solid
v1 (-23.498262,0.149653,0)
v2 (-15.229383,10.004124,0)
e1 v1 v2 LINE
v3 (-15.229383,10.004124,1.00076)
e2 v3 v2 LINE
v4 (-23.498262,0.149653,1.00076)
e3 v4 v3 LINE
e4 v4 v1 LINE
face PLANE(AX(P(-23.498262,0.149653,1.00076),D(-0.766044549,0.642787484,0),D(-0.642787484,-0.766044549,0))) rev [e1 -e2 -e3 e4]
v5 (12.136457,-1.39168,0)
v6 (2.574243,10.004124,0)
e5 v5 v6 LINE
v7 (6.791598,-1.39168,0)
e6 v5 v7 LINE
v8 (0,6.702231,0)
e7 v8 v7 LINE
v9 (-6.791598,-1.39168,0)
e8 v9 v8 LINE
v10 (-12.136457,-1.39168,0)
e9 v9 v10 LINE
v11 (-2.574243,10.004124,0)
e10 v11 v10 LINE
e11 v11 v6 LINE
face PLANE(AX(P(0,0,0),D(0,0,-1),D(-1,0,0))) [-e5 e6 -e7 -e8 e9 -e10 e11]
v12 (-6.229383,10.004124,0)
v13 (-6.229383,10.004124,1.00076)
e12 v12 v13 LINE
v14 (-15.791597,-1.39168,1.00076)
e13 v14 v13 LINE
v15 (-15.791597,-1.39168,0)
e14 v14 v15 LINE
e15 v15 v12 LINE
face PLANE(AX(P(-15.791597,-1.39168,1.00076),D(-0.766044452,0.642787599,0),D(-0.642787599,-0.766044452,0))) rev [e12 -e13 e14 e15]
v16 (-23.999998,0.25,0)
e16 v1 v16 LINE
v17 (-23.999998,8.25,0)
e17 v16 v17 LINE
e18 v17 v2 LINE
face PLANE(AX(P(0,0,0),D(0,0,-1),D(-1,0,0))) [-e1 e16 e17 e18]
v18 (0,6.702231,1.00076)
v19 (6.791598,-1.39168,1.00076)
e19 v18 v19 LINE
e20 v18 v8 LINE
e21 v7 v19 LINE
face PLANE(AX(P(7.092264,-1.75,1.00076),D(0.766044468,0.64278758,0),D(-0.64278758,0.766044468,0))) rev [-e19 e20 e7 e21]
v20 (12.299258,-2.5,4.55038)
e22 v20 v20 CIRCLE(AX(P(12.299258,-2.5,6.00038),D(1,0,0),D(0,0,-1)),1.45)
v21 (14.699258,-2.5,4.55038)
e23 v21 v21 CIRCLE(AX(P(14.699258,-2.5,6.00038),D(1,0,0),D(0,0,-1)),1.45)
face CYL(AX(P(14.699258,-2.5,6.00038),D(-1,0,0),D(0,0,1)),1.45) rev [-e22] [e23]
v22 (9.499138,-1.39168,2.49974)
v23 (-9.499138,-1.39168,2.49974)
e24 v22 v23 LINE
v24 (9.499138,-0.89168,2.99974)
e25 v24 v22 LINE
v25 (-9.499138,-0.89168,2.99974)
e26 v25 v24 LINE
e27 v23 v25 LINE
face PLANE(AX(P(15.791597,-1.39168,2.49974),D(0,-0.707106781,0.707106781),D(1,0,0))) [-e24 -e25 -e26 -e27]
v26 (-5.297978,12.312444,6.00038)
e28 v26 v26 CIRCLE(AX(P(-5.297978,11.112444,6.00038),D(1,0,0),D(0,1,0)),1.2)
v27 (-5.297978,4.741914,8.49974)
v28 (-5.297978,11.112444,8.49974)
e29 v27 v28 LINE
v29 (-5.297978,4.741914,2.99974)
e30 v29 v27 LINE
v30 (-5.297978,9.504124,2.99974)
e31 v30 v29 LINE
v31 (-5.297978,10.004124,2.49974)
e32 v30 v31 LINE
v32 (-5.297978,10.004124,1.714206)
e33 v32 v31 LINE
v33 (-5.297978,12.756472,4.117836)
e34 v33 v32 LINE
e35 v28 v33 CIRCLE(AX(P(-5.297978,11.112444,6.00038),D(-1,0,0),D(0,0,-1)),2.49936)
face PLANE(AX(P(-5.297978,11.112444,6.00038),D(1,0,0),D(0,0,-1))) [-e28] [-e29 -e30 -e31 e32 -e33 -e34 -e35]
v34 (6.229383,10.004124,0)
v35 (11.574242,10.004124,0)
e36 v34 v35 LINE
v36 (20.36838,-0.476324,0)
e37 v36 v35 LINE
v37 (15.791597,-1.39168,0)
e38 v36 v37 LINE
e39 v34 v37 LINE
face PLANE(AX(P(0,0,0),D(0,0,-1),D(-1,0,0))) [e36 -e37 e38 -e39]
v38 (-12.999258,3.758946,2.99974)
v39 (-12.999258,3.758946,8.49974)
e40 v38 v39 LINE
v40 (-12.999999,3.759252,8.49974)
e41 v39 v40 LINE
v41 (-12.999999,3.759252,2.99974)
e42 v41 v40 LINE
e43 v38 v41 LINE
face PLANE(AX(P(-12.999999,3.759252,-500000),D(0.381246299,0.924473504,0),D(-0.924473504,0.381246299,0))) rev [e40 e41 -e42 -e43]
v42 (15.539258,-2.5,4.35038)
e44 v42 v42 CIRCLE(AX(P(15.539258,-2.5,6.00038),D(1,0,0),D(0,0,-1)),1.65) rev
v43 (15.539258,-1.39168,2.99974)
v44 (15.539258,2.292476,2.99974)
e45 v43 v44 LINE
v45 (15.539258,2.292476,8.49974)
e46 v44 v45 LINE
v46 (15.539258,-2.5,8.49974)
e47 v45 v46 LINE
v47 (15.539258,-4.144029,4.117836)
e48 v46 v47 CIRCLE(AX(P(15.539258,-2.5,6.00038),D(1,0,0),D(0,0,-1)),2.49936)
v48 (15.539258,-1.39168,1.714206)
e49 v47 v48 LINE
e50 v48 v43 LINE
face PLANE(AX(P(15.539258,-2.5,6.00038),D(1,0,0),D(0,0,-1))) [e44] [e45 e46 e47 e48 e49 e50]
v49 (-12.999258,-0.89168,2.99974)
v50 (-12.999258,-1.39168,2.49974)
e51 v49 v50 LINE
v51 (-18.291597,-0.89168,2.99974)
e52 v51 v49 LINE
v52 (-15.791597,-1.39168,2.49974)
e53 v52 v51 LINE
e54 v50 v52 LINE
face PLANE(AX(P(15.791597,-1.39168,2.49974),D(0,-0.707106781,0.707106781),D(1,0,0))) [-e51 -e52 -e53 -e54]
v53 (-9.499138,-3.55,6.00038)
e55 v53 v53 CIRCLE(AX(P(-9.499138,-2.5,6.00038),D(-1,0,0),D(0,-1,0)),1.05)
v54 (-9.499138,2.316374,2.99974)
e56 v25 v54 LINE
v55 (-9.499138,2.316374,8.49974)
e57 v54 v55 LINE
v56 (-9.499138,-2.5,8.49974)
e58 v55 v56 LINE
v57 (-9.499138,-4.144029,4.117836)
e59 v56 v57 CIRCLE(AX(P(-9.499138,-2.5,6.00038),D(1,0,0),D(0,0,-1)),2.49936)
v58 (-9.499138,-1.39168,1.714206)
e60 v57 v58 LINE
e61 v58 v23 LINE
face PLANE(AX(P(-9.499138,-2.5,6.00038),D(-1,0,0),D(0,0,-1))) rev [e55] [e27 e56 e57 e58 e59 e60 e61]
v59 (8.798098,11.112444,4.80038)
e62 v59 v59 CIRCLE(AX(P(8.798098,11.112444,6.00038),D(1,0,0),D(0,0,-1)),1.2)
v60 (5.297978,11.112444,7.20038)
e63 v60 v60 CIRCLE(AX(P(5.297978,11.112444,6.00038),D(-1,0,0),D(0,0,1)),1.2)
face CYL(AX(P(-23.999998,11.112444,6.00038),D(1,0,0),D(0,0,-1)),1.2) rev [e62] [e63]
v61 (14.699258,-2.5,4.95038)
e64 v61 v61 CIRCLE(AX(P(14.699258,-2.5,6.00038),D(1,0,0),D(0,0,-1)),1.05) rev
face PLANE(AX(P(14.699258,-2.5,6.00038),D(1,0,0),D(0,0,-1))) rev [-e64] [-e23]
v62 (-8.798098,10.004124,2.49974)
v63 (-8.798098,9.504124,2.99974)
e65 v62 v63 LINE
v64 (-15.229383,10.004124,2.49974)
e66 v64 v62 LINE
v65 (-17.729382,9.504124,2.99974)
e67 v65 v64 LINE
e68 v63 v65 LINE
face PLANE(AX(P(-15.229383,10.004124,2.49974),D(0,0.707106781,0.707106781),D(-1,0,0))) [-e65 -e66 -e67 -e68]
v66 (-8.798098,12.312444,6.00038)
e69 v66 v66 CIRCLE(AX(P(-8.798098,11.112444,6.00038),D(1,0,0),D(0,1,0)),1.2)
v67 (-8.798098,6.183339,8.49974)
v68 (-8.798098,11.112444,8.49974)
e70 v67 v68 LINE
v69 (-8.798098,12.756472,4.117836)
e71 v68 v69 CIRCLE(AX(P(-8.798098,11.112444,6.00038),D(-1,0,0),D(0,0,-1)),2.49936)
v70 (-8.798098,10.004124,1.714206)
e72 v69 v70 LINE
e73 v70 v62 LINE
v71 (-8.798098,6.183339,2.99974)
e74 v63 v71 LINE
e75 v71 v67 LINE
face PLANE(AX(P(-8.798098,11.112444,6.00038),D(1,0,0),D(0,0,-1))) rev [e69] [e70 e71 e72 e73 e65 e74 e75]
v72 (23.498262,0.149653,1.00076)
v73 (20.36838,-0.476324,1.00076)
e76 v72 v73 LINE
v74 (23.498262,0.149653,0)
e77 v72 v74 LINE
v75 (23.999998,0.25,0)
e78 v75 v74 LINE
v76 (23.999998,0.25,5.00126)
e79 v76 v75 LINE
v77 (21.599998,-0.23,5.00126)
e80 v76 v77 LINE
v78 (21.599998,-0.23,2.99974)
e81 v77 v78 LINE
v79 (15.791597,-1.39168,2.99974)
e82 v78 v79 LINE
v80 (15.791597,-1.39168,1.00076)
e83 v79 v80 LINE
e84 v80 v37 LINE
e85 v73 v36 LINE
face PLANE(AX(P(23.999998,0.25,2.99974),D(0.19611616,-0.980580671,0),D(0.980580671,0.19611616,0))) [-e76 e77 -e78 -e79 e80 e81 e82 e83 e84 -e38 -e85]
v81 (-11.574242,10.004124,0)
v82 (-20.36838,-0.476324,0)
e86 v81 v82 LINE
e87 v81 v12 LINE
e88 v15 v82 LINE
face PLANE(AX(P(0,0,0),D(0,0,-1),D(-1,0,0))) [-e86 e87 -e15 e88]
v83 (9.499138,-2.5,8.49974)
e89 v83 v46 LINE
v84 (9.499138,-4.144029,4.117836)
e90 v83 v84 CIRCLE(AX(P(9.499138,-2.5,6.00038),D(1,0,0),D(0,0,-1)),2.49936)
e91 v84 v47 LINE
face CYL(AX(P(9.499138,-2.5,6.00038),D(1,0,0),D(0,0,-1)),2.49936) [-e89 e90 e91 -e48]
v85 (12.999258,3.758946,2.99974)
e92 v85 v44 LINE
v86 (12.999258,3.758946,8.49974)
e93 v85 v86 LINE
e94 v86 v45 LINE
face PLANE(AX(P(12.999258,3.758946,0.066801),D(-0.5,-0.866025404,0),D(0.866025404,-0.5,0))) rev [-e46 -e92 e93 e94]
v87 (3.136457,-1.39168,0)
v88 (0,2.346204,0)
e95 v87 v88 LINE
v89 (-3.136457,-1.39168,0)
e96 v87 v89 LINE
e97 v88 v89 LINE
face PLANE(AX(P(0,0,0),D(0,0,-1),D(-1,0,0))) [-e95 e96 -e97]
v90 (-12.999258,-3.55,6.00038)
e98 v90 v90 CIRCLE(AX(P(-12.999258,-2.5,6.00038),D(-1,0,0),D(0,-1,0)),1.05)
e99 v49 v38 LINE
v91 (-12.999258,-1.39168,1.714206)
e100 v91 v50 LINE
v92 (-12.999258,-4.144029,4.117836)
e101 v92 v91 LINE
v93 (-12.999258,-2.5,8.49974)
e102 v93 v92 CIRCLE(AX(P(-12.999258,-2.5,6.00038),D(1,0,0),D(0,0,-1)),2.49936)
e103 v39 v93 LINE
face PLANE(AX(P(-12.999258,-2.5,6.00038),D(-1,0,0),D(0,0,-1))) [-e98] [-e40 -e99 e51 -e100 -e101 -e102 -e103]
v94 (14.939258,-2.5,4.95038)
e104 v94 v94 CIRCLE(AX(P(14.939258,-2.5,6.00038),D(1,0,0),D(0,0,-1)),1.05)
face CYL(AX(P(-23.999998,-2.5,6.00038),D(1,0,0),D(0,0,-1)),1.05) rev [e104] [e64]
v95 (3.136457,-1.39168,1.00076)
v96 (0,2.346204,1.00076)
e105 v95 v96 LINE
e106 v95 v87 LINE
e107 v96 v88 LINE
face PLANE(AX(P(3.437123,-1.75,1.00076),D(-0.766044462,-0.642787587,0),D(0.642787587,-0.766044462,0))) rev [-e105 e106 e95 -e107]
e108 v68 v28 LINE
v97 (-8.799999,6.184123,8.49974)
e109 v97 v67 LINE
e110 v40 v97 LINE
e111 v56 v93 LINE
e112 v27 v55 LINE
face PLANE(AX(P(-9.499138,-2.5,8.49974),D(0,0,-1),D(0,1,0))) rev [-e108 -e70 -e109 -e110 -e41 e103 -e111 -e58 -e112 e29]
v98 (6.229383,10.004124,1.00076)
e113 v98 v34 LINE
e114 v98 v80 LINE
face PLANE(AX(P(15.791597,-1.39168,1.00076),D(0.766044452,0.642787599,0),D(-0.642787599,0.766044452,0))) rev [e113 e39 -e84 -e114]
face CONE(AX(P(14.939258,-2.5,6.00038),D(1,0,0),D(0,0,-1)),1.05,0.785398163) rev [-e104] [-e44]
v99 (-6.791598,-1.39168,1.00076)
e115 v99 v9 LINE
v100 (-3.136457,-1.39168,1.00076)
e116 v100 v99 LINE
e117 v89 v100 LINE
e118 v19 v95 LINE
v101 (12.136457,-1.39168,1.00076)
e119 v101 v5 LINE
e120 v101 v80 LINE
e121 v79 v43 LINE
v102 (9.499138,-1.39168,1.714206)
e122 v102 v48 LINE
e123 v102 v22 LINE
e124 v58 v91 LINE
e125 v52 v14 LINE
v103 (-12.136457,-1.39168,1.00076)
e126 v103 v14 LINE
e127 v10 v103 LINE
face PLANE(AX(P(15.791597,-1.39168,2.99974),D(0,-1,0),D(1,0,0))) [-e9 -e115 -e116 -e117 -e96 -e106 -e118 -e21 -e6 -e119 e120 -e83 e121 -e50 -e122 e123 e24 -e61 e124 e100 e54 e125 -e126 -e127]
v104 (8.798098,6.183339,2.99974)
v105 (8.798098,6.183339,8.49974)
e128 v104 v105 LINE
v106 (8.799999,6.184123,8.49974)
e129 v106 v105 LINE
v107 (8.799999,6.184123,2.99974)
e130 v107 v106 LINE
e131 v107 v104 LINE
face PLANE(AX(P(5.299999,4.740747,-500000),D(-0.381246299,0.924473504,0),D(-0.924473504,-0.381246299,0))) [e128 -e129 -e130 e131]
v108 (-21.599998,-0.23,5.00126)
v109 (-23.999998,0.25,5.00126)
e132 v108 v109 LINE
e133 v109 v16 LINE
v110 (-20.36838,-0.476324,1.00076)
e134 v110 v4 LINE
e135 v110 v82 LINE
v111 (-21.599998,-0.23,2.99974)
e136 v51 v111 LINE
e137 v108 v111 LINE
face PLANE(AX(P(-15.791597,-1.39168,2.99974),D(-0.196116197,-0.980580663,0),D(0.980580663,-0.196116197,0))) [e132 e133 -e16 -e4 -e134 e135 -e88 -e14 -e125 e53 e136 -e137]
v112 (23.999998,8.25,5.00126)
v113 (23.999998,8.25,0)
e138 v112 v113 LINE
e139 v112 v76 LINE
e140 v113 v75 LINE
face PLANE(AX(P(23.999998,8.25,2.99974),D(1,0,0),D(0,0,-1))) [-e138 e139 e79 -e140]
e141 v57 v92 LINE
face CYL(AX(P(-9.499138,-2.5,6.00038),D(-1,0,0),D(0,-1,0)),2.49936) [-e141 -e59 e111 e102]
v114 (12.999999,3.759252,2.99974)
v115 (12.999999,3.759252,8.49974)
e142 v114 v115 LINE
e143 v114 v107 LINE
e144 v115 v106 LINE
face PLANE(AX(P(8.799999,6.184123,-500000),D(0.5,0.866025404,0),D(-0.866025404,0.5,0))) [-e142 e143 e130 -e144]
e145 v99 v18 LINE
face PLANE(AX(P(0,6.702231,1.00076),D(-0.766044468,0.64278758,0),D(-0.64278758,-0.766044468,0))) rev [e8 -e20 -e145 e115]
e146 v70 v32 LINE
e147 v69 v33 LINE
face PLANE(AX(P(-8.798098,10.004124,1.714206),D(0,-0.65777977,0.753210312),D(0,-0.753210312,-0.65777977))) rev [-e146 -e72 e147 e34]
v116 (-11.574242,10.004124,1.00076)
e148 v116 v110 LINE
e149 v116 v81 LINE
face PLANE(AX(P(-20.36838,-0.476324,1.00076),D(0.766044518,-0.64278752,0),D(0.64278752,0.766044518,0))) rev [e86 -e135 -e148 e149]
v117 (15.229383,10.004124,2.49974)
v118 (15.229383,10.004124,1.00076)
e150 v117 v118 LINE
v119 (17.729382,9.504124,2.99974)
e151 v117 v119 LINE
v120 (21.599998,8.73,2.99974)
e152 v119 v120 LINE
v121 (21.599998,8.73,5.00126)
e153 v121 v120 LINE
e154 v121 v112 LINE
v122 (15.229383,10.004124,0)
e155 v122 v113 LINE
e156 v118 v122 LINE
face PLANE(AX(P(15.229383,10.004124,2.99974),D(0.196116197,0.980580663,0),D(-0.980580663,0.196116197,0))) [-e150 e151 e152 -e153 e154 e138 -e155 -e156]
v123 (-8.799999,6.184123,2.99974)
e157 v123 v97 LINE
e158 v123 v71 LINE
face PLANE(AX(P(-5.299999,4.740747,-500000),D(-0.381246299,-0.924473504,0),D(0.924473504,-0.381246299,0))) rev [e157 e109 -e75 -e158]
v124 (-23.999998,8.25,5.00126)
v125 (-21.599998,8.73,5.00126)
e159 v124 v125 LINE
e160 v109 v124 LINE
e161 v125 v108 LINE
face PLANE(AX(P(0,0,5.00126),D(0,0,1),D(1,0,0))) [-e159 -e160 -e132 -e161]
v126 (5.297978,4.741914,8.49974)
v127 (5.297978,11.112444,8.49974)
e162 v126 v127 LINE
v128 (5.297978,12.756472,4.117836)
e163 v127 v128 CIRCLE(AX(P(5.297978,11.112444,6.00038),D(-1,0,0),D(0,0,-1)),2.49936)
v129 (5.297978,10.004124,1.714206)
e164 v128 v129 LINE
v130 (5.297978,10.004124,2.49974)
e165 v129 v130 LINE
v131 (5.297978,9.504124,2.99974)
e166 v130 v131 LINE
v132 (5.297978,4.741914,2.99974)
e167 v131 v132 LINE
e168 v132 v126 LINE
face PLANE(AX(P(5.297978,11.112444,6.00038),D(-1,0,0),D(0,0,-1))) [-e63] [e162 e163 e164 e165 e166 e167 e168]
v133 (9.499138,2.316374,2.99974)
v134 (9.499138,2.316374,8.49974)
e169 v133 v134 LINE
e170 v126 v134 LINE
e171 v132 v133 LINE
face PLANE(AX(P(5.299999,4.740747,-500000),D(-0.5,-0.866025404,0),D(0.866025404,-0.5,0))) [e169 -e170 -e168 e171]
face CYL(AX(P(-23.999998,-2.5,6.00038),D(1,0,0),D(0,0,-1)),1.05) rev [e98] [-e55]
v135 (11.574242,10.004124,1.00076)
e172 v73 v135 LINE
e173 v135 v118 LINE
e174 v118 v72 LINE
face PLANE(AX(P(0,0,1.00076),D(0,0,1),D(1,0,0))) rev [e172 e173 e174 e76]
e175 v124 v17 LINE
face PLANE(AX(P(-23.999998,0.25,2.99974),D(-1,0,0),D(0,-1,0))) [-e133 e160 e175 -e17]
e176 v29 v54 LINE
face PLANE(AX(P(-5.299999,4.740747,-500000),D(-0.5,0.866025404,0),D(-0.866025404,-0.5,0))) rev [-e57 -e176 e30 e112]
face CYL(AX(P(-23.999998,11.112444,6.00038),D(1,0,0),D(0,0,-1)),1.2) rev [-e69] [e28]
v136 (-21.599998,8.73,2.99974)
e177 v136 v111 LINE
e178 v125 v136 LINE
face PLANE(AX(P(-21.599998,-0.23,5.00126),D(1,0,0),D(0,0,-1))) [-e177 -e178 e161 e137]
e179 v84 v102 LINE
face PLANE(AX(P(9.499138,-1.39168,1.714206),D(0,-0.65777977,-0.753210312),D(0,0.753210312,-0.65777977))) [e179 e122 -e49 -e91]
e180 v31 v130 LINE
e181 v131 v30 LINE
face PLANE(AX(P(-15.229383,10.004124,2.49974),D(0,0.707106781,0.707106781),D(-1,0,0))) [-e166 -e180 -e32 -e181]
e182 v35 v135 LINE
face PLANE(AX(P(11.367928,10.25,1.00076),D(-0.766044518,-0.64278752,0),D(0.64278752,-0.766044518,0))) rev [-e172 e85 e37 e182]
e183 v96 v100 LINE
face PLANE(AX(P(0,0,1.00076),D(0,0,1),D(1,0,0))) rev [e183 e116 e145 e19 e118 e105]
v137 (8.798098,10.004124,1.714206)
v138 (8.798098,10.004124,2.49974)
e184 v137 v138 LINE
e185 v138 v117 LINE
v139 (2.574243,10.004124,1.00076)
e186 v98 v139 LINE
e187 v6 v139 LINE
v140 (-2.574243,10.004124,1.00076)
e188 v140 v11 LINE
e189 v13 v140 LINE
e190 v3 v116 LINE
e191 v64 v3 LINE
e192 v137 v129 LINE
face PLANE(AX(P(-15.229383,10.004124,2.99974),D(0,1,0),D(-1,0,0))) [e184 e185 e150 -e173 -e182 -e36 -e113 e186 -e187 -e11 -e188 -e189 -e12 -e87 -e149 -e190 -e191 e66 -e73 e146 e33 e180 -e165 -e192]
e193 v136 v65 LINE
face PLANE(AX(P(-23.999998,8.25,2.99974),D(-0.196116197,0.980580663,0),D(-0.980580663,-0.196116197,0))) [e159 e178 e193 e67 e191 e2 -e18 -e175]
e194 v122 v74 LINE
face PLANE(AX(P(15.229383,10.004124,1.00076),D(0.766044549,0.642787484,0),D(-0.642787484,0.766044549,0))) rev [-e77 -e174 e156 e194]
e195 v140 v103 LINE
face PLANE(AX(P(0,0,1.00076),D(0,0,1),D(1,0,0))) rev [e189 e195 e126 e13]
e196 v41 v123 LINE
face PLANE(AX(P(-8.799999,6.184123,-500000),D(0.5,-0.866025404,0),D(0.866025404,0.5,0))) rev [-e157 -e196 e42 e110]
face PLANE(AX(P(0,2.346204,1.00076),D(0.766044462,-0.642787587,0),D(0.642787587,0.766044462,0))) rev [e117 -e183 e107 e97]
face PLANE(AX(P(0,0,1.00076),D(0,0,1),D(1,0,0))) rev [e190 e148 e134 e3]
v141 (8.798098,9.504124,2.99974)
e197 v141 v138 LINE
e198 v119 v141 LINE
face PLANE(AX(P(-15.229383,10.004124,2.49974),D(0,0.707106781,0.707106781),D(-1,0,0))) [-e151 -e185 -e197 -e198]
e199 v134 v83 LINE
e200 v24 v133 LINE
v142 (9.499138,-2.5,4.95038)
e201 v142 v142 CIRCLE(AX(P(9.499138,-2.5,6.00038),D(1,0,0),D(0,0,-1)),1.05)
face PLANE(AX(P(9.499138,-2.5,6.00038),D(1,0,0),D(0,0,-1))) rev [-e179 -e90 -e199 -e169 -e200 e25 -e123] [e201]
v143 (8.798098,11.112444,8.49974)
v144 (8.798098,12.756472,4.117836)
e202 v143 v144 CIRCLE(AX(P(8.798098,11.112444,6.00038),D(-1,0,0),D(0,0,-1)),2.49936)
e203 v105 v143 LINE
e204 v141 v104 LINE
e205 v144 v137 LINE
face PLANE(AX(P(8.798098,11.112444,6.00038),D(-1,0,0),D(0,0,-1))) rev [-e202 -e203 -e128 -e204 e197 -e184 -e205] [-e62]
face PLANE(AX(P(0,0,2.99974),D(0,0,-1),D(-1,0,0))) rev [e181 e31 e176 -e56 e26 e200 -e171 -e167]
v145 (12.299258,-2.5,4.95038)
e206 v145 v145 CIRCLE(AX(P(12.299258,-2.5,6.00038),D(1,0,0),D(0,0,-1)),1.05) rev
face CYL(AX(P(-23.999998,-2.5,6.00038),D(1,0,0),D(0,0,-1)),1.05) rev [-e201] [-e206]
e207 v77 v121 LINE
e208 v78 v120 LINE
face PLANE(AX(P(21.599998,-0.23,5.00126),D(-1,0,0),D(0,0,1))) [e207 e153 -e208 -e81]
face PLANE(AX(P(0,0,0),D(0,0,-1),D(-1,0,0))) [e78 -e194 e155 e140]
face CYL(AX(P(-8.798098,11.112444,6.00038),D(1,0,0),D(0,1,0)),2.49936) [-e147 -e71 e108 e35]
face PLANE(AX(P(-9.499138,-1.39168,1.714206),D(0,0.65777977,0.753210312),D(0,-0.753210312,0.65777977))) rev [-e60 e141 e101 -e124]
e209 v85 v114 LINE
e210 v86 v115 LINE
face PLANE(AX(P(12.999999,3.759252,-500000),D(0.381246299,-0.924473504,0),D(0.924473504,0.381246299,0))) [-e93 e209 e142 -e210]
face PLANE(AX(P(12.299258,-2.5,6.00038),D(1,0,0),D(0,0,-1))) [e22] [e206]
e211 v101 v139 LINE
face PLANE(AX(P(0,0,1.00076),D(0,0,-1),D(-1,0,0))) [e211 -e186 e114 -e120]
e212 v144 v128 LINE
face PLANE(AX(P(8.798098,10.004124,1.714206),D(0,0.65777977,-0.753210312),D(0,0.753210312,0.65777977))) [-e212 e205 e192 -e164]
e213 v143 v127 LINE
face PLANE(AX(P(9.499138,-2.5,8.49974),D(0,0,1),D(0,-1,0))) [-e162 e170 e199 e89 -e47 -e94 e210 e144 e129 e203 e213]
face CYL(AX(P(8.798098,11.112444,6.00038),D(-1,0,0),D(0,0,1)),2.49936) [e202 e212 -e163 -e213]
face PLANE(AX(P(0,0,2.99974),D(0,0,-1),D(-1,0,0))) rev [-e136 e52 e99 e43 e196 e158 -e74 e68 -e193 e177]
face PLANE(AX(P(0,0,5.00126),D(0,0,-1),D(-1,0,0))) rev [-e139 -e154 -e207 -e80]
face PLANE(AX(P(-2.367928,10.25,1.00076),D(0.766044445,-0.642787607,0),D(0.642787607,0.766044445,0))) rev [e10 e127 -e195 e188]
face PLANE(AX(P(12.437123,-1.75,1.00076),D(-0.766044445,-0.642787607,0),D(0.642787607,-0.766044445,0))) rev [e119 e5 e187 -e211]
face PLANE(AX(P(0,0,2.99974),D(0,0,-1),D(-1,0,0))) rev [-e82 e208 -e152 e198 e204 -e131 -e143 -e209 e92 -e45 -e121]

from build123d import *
from OCP.BRepAlgoAPI import BRepAlgoAPI_Cut
from OCP.TopTools import TopTools_ListOfShape

# Parameters (mm, degrees)
BOSS_EXTRUDE1_DEPTH    = 2.99974
BOSS_EXTRUDE2_DEPTH    = 5.00126
BOSS_EXTRUDE3_DEPTH    = 3.50012
CIRPATTERN1_COUNT      = 2
BOSS_EXTRUDE4_REACH    = 30.871
CUT_EXTRUDE1_DEPTH     = 5.5
CUT_EXTRUDE2_DEPTH     = 1.00076
MIRROR2_START          = -12.999258093
MIRROR2_DEPTH          = 7.70128
MIRROR2_START_2        = 2.99974
MIRROR2_2_DEPTH        = 5.5
MIRROR2_3_OUTLINE_W    = 4.20116
MIRROR2_3_OUTLINE_H    = 4.60831964
MIRROR2_3_OUTLINE_H_2  = 4.995876312
MIRROR2_3_DEPTH        = 2.99974
MIRROR2_4_DEPTH        = 5.5
SKETCH9_R              = 1.05
OUTSIDE_HOLES_DEPTH    = 41.329539227
SKETCH10_R             = 1.2
INSIDE_HOLES_DEPTH     = 37.513584997
BOSS_EXTRUDE5_START    = 2.54
SKETCH12_R             = 1.05
BOSS_EXTRUDE5_DEPTH    = 2.54
HEAD_POCKET_DEPTH      = 1.7
HEAD_POCKET_DEPTH_BACK = 0.7
SKETCH11_R             = 1.45
CHAMFER1_SIZE          = 0.6
CORNER_CUT_DEPTH       = 5.5
CHAMFER2_SIZE          = 0.5


with BuildPart() as part:
    # Sketch1 → Boss-Extrude1 (new body)
    with BuildSketch(Plane(origin=(0, 0, 0), x_dir=(-1, 0, 0), z_dir=(0, 0, -1))):
        Polygon((23.999998093, 0.250000321), (23.999998093, 8.25), (15.229382515, 10.004123688), (-15.229382515, 10.004123688), (-23.999998093, 8.25), (-23.999998093, 0.25), (-15.791597366, -1.39168036), (15.791597366, -1.39168036), align=None)
    extrude(amount=-BOSS_EXTRUDE1_DEPTH)

    # Sketch2 → Boss-Extrude2 (add)
    with BuildSketch(Plane(origin=(0, 0, 0), x_dir=(-1, 0, 0), z_dir=(0, 0, -1))):
        Polygon((21.599998474, -0.230000138), (21.599998474, 8.729999542), (23.999998093, 8.25), (23.999998093, 0.249999762), align=None)
        Polygon((-23.999998093, 0.249999762), (-23.999998093, 8.25), (-21.599998474, 8.729999542), (-21.599998474, -0.230000138), align=None)
    extrude(amount=-BOSS_EXTRUDE2_DEPTH)

    # Sketch3 → Boss-Extrude3 (add)
    with BuildSketch(Plane(origin=(12.999258093, 0, 0), x_dir=(0, 0, -1), z_dir=(1, 0, 0))):
        with BuildLine():
            Line((-2.99974, 4.117571831), (-8.49974, 4.117571354))
            Line((-8.49974, 4.117571354), (-8.49974, -2.500000222))
            ThreePointArc((-8.49974, -2.500000222), (-6.87834524, -4.840080872), (-4.117836275, -4.144028668))
            Line((-4.117836275, -4.144028668), (-1.714206095, -1.39168036))
            Line((-1.714206095, -1.39168036), (-2.99974, -1.39168036))
            Line((-2.99974, -1.39168036), (-2.99974, 4.117571831))
        make_face()
    boss_extrude3 = extrude(amount=-BOSS_EXTRUDE3_DEPTH)

    # CirPattern1: Boss-Extrude3 ×2 about axis
    cirpattern1_axis = Axis((9.148618093, 4.306221664, 0), (0, 0, 1))
    for i in range(1, CIRPATTERN1_COUNT):
        add(boss_extrude3.rotate(cirpattern1_axis, i * 360 / CIRPATTERN1_COUNT))

    # Sketch4 → Boss-Extrude4 (add, up to next)
    with BuildSketch(Plane.XY.offset(8.49974), mode=Mode.PRIVATE) as boss_extrude4_sk1:
        Polygon((8.799999237, 6.184122562), (12.999999024, 3.759251555), (9.499999024, 2.315876444), (5.299999237, 4.740747452), align=None)
    boss_extrude4_tool1 = extrude(boss_extrude4_sk1.sketch, amount=-BOSS_EXTRUDE4_REACH, mode=Mode.PRIVATE) - part.part
    add(boss_extrude4_tool1.solids().sort_by_distance((9.149999, 4.25, 8.49974))[0])


with BuildPart() as cut_extrude1_tool:
    # Sketch5 → Cut-Extrude1 (new body)
    with BuildSketch(Plane.XY.offset(8.49974)):
        Polygon((12.999999024, 3.759251555), (12.999258093, 4.117571354), (12.379370927, 4.117571354), align=None)
        Polygon((5.725868057, 4.494871974), (5.297978093, 4.494871974), (5.297978093, 4.74191436), align=None)
    extrude(amount=-CUT_EXTRUDE1_DEPTH)


with BuildPart() as part_1:
    add(part.part)

    # Cut-Extrude1: cut by cut_extrude1_tool, with a tolerance
    cut_extrude1_stock = TopTools_ListOfShape()
    cut_extrude1_stock.Append(part_1.part.wrapped)
    cut_extrude1_tools = TopTools_ListOfShape()
    cut_extrude1_tools.Append(cut_extrude1_tool.part.wrapped)
    cut_extrude1_cut = BRepAlgoAPI_Cut()
    cut_extrude1_cut.SetArguments(cut_extrude1_stock)
    cut_extrude1_cut.SetTools(cut_extrude1_tools)
    cut_extrude1_cut.SetFuzzyValue(0.00001)
    cut_extrude1_cut.Build()
    add(Compound.cast(cut_extrude1_cut.Shape()).solids(), mode=Mode.REPLACE)


with BuildPart() as cut_extrude2_tool:
    # Sketch6 → Cut-Extrude2 (new body)
    with BuildSketch(Plane(origin=(0, 0, 0), x_dir=(-1, 0, 0), z_dir=(0, 0, -1))):
        Polygon((20.368379593, -0.476323605), (11.367927551, 10.25), (15.229382515, 10.004123688), (23.498262405, 0.149653077), align=None)
        Polygon((2.36792779, 10.25), (12.437123299, -1.75), (15.791597366, -1.39168036), (6.023067951, 10.25), align=None)
        Polygon((0, 6.702231407), (7.092263699, -1.75), (3.437123299, -1.75), (0, 2.346204281), (-3.437123299, -1.75), (-7.092263699, -1.75), align=None)
        Polygon((-15.791597366, -1.39168036), (-6.023067951, 10.25), (-2.36792779, 10.25), (-12.437123299, -1.75), align=None)
        Polygon((-11.367927551, 10.25), (-20.368379593, -0.476323605), (-23.498262405, 0.149653077), (-15.229382515, 10.004123688), align=None)
    extrude(amount=-CUT_EXTRUDE2_DEPTH)


with BuildPart() as part_2:
    add(part_1.part)

    # Cut-Extrude2: cut by cut_extrude2_tool, with a tolerance
    cut_extrude2_stock = TopTools_ListOfShape()
    cut_extrude2_stock.Append(part_2.part.wrapped)
    cut_extrude2_tools = TopTools_ListOfShape()
    cut_extrude2_tools.Append(cut_extrude2_tool.part.wrapped)
    cut_extrude2_cut = BRepAlgoAPI_Cut()
    cut_extrude2_cut.SetArguments(cut_extrude2_stock)
    cut_extrude2_cut.SetTools(cut_extrude2_tools)
    cut_extrude2_cut.SetFuzzyValue(0.00001)
    cut_extrude2_cut.Build()
    add(Compound.cast(cut_extrude2_cut.Shape()).solids(), mode=Mode.REPLACE)

    # Mirror2: read off the stored shape, not the designer's step
    # Mirror2 outline → Mirror2 (add)
    with BuildSketch(Plane.YZ.offset(MIRROR2_START)):
        with BuildLine():
            Line((11.11244355, 8.49974), (-2.500000222, 8.49974))
            ThreePointArc((-2.500000222, 8.49974), (-4.840080872, 6.87834524), (-4.144028668, 4.117836275))
            Line((-4.144028668, 4.117836275), (-1.39168036, 1.714206095))
            Line((-1.39168036, 1.714206095), (-1.39168036, 2.99974))
            Line((-1.39168036, 2.99974), (10.004123688, 2.99974))
            Line((10.004123688, 2.99974), (10.004123688, 1.714206095))
            Line((10.004123688, 1.714206095), (12.756471996, 4.117836275))
            ThreePointArc((12.756471996, 4.117836275), (13.4525242, 6.87834524), (11.11244355, 8.49974))
        make_face()
    extrude(amount=MIRROR2_DEPTH)

    # Mirror2 2 outline → Mirror2 2 (cut)
    with BuildSketch(Plane.XY.offset(MIRROR2_START_2)):
        Polygon((-5.297978093, 4.74191436), (-9.499138093, 2.316373503), (-9.499138093, -6), (-5.297978093, -6), align=None)
        Polygon((-12.999258093, 3.759679332), (-8.799999237, 6.184122562), (-8.798098093, 6.183338544), (-8.798098093, 15), (-12.999258093, 15), align=None)
    extrude(amount=MIRROR2_2_DEPTH, mode=Mode.SUBTRACT)

    # Mirror2 3 outline → Mirror2 3 (cut)
    with BuildSketch(Plane.XY):
        with Locations((-7.398558093, -3.69584018)):
            Rectangle(MIRROR2_3_OUTLINE_W, MIRROR2_3_OUTLINE_H)
        with Locations((-10.898678093, 12.502061844)):
            Rectangle(MIRROR2_3_OUTLINE_W, MIRROR2_3_OUTLINE_H_2)
    extrude(amount=MIRROR2_3_DEPTH, mode=Mode.SUBTRACT)

    # Mirror2 4 outline → Mirror2 4 (add)
    with BuildSketch(Plane.XY.offset(MIRROR2_START_2)):
        Polygon((-12.999999024, 3.759251555), (-12.999258093, 3.758946), (-12.999258093, 3.759679332), align=None)
    extrude(amount=MIRROR2_4_DEPTH)

    # Sketch9 → Outside_Holes (cut, through all)
    with BuildSketch(Plane(origin=(12.999258093, 0, 0), x_dir=(0, 0, -1), z_dir=(1, 0, 0))):
        with Locations((-6.00038, -2.500000222)):
            Circle(SKETCH9_R)
    extrude(amount=-OUTSIDE_HOLES_DEPTH, mode=Mode.SUBTRACT)

    # Sketch10 → Inside_Holes (cut, through all)
    with BuildSketch(Plane(origin=(8.798098093, 0, 0), x_dir=(0, 0, -1), z_dir=(1, 0, 0))):
        with Locations((-6.00038, 11.11244355)):
            Circle(SKETCH10_R)
    extrude(amount=-INSIDE_HOLES_DEPTH, mode=Mode.SUBTRACT)

    # Sketch12 → Boss-Extrude5 (add)
    with BuildSketch(Plane(origin=(12.999258093, 0, 0), x_dir=(0, 0, -1), z_dir=(1, 0, 0)).offset(BOSS_EXTRUDE5_START)):
        with BuildLine():
            Line((-2.99974, 3.758946), (-8.49974, 3.758946))
            Line((-8.49974, 3.758946), (-8.49974, -2.500000222))
            ThreePointArc((-8.49974, -2.500000222), (-6.87834524, -4.840080872), (-4.117836275, -4.144028668))
            Line((-4.117836275, -4.144028668), (-1.714206095, -1.39168036))
            Line((-1.714206095, -1.39168036), (-2.99974, -1.39168036))
            Line((-2.99974, -1.39168036), (-2.99974, 3.758946))
        make_face()
        with Locations((-6.00038, -2.500000222)):
            Circle(SKETCH12_R, mode=Mode.SUBTRACT)
    extrude(amount=-BOSS_EXTRUDE5_DEPTH)

    # Sketch11 → Head_Pocket (cut, two sides: drawn at the far end of the back side and taken through both)
    with BuildSketch(Plane(origin=(12.999258093, 0, 0), x_dir=(0, 0, -1), z_dir=(1, 0, 0)).offset(-HEAD_POCKET_DEPTH_BACK)):
        with Locations((-6.00038, -2.500000222)):
            Circle(SKETCH11_R)
    extrude(amount=HEAD_POCKET_DEPTH + HEAD_POCKET_DEPTH_BACK, mode=Mode.SUBTRACT)

    # Chamfer1
    chamfer1_edges = [part_2.edges().sort_by_distance(p)[0] for p in [
        (15.539258093, -2.500000222, 7.05038),
    ]]
    chamfer(chamfer1_edges, length=CHAMFER1_SIZE)

    # Sketch13 → Corner_Cut (cut)
    with BuildSketch(Plane.XY.offset(8.49974)):
        Polygon((15.539258093, 3.758946), (15.539258093, 2.292476317), (12.999258093, 3.758946), align=None)
    extrude(amount=-CORNER_CUT_DEPTH, mode=Mode.SUBTRACT)

    # Chamfer2
    chamfer2_edges = [part_2.edges().sort_by_distance(p)[0] for p in [
        (-10.898678093, 10.004123688, 2.99974),
        (-14.39542773, -1.39168036, 2.99974),
        (0, 10.004123688, 2.99974),
        (2.10058, -1.39168036, 2.99974),
        (12.013740304, 10.004123688, 2.99974),
    ]]
    chamfer(chamfer2_edges, length=CHAMFER2_SIZE)


solid = part_2.part
